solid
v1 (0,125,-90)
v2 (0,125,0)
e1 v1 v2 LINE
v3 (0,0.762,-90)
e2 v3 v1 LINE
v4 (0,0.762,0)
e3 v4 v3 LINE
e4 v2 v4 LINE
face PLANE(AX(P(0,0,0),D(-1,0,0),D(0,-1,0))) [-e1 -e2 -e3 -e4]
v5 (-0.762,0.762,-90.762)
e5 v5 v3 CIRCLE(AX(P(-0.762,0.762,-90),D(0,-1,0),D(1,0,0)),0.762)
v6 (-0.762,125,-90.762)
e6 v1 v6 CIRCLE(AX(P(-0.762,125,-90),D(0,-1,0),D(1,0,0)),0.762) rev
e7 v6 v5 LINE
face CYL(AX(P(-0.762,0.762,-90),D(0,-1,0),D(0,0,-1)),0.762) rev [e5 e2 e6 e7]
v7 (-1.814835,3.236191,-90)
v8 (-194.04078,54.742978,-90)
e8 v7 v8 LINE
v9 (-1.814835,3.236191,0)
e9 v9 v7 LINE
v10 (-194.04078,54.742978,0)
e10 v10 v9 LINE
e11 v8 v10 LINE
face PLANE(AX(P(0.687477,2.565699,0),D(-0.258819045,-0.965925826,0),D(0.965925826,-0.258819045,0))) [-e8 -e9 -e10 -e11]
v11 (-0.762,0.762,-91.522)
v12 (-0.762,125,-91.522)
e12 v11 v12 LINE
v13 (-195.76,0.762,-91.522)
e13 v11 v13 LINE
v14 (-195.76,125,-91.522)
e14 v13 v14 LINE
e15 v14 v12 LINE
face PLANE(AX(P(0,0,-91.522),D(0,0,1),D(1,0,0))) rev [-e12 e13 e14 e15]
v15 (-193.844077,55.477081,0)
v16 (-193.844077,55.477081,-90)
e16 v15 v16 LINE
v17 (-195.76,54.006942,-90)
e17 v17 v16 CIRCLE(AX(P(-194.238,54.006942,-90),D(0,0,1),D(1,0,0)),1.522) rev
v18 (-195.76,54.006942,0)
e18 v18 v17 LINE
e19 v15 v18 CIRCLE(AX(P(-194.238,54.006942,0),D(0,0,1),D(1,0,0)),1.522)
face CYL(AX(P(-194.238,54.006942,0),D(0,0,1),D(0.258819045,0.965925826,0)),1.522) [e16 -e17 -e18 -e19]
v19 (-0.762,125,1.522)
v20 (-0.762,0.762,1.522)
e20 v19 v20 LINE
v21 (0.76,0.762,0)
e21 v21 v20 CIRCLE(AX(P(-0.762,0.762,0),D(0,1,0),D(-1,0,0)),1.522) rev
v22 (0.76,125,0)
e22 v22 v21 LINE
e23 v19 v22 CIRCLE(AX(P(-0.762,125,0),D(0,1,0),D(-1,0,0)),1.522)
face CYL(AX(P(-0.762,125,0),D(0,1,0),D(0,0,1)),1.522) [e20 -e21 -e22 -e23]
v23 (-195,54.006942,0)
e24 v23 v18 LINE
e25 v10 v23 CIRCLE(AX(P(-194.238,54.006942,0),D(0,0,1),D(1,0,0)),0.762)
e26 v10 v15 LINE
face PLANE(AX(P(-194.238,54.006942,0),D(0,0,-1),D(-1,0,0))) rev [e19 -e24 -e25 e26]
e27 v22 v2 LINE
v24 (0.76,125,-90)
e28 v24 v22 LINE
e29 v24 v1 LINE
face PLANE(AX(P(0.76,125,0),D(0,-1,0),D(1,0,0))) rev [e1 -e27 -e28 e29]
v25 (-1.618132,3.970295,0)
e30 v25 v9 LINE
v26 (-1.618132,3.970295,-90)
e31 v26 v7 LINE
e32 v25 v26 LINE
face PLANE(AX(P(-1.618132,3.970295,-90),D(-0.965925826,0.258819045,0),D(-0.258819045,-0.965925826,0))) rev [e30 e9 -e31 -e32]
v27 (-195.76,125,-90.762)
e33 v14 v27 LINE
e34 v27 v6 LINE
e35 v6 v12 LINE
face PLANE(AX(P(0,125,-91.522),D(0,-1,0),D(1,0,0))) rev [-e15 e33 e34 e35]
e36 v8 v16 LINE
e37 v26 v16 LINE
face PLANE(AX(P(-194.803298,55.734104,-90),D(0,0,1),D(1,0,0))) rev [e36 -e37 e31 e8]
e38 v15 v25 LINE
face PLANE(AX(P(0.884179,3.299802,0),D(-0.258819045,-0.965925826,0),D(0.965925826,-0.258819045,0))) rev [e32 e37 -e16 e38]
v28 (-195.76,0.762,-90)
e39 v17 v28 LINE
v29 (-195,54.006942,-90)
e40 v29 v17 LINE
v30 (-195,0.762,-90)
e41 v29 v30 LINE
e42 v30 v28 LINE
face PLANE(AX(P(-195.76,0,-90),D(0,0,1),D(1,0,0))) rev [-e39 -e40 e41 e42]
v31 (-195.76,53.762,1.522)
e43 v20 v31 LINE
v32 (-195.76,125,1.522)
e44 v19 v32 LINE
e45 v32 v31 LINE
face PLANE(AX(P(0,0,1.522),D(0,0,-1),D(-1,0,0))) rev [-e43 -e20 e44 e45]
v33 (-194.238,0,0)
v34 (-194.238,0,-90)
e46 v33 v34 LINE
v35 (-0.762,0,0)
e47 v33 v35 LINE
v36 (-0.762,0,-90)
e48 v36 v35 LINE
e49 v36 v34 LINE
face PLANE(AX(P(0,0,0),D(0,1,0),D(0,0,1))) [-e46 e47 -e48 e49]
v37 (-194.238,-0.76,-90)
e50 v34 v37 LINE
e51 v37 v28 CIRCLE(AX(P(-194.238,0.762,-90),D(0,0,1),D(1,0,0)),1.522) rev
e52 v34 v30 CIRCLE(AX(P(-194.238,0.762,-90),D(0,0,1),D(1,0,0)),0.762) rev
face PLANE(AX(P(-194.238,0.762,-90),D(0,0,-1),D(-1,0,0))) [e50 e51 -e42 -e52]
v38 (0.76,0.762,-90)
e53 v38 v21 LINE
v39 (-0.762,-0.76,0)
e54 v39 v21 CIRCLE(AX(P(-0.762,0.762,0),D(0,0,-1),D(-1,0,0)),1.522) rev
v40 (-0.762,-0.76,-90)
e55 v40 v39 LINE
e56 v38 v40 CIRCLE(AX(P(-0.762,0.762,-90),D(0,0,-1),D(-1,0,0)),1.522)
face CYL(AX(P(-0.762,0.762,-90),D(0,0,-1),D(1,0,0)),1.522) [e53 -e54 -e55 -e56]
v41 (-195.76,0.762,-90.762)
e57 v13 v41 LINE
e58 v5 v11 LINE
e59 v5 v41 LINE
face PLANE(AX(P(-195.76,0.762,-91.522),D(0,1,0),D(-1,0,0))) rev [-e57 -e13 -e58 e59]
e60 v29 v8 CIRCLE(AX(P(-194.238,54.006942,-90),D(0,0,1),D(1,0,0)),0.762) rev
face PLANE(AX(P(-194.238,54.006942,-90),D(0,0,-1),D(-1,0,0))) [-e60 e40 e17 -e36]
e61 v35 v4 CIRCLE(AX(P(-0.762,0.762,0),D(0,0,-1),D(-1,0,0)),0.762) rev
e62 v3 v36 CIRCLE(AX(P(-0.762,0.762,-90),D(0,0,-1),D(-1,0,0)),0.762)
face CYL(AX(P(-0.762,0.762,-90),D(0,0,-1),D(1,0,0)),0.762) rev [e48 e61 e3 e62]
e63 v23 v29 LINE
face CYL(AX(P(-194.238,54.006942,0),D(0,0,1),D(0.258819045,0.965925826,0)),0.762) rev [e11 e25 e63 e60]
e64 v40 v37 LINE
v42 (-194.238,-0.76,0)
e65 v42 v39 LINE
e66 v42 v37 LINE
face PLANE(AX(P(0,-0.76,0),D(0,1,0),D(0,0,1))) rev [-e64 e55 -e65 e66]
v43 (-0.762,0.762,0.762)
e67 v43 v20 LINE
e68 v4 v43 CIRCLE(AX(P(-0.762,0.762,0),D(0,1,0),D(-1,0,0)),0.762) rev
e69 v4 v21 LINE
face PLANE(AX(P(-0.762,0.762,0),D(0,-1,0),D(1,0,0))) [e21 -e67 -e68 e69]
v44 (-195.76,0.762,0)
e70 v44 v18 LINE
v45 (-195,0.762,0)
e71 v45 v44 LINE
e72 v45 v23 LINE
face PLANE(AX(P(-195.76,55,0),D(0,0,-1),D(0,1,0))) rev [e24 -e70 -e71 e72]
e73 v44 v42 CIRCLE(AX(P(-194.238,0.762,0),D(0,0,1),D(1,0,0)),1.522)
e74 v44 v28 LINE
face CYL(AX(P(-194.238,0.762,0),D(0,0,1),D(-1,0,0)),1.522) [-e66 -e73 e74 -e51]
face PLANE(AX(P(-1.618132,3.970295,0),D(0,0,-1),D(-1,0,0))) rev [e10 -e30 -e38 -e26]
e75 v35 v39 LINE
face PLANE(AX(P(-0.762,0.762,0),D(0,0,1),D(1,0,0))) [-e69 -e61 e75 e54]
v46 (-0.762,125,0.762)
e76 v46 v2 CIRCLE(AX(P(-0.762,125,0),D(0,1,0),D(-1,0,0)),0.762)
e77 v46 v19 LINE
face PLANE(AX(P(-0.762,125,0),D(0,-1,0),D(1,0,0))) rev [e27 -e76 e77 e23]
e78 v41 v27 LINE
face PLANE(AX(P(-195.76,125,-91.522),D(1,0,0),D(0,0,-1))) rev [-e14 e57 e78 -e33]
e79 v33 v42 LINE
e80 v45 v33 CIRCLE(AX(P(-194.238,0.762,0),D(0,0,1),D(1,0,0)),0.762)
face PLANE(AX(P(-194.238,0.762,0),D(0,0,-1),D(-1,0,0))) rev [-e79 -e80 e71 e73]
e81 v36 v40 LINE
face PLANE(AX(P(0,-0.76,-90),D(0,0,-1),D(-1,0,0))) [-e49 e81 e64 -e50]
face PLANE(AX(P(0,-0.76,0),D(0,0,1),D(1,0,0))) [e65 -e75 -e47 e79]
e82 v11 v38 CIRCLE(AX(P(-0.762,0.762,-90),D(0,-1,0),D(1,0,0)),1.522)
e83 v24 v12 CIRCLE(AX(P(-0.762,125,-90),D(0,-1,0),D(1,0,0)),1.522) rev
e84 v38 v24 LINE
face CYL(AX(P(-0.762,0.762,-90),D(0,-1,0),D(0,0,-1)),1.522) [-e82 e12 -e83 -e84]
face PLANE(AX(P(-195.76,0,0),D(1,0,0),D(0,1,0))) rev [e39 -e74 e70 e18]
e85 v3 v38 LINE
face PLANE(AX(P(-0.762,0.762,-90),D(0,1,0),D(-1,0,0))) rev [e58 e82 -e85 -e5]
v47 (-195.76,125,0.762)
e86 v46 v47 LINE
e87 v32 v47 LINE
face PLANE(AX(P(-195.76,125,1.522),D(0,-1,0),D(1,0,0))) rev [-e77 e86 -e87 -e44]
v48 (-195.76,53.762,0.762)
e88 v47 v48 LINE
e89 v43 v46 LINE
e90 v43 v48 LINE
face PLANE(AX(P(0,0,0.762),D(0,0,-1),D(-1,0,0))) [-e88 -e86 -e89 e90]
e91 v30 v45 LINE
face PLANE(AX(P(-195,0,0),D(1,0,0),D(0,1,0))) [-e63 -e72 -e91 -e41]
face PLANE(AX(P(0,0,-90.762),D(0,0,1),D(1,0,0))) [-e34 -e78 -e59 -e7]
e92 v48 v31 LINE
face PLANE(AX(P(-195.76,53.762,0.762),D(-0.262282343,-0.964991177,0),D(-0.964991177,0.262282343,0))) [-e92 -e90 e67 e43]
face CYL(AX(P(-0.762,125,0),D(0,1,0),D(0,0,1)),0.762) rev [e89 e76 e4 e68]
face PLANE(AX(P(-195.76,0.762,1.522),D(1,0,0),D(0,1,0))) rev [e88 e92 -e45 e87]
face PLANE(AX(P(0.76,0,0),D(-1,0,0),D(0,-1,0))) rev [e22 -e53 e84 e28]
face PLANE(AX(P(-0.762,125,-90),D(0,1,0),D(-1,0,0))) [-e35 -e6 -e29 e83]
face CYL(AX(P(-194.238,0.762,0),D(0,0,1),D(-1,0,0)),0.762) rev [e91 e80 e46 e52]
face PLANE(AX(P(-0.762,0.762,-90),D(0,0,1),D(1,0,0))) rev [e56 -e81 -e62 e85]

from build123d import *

# Parameters (mm, degrees)
SKETCH3_W                    = 195
SKETCH3_H                    = 90
BASE_FLANGE1_DEPTH           = 0.76
EDGE_FLANGE1_STRIP_W         = 4.564
EDGE_FLANGE1_STRIP_H         = 0.76
EDGE_FLANGE1_STRIP_CUT_DEPTH = 90
EDGE_FLANGE1_DEPTH           = 90
EDGE_FLANGE2_STRIP_CUT_DEPTH = 90
EDGE_FLANGE2_DEPTH           = 90
EDGE_FLANGE3_STRIP_W         = 4.564
EDGE_FLANGE3_STRIP_H         = 0.76
EDGE_FLANGE3_STRIP_CUT_DEPTH = 90
EDGE_FLANGE3_DEPTH           = 90
EDGE_FLANGE6_DEPTH           = 124.238
EDGE_FLANGE7_DEPTH           = 124.238
CUT_EXTRUDE1_REACH           = 252.208


# Sheet-metal steps are written as plain solids
with BuildPart() as part:
    # Sketch3 → Base-Flange1 (new body)
    with BuildSketch(Plane(origin=(0, 0, 0), x_dir=(1, 0, 0), z_dir=(0, 1, 0))):
        with Locations((-97.5, 45)):
            Rectangle(SKETCH3_W, SKETCH3_H)
    extrude(amount=-BASE_FLANGE1_DEPTH)

    # Edge-Flange1 strip (across the edge) → Edge-Flange1 strip cut (cut)
    with BuildSketch(Plane(origin=(-195, 0, -90), x_dir=(1, 0, 0), z_dir=(0, 0, 1))):
        with Locations((-1.52, -0.38)):
            Rectangle(EDGE_FLANGE1_STRIP_W, EDGE_FLANGE1_STRIP_H)
    extrude(amount=EDGE_FLANGE1_STRIP_CUT_DEPTH, mode=Mode.SUBTRACT)

    # Edge-Flange1 section (across the edge) → Edge-Flange1 (add)
    with BuildSketch(Plane(origin=(-195, 0, -90), x_dir=(1, 0, 0), z_dir=(0, 0, 1))):
        with BuildLine():
            Line((-0.76, 0.762), (-0.76, 55))
            Line((-0.76, 55), (0, 55))
            Line((0, 55), (0, 0.762))
            ThreePointArc((0, 0.762), (0.223184633, 0.223184633), (0.762, 0))
            Line((0.762, 0), (0.762, -0.76))
            ThreePointArc((0.762, -0.76), (-0.314216521, -0.314216521), (-0.76, 0.762))
        make_face()
    extrude(amount=EDGE_FLANGE1_DEPTH)

    # Edge-Flange2 strip (across the edge) → Edge-Flange2 strip cut (cut)
    with BuildSketch(Plane(origin=(-195, 55, -90), x_dir=(-0.2588190451025146, -0.96592582628907, 0), z_dir=(0, 0, 1))):
        Polygon((-4.589327535, -2.016516504), (1.155922587, -0.477081374), (0.959220112, 0.257022254), (-4.786030009, -1.282412876), align=None)
    extrude(amount=EDGE_FLANGE2_STRIP_CUT_DEPTH, mode=Mode.SUBTRACT)

    # Edge-Flange2 section (across the edge) → Edge-Flange2 (add)
    with BuildSketch(Plane(origin=(-195, 55, -90), x_dir=(-0.2588190451025146, -0.96592582628907, 0), z_dir=(0, 0, 1))):
        with BuildLine():
            Line((-0.76, 0.993057734), (-0.76, 200))
            Line((-0.76, 200), (0, 200))
            Line((0, 200), (0, 0.993057734))
            ThreePointArc((0, 0.993057734), (0.298123791, 0.388522489), (0.959220112, 0.257022254))
            Line((0.959220112, 0.257022254), (1.155922587, -0.477081374))
            ThreePointArc((1.155922587, -0.477081374), (-0.164534895, -0.21442605), (-0.76, 0.993057734))
        make_face()
    extrude(amount=EDGE_FLANGE2_DEPTH)

    # Edge-Flange3 strip (across the edge) → Edge-Flange3 strip cut (cut)
    with BuildSketch(Plane(origin=(0, 0, 0), x_dir=(-1, 0, 0), z_dir=(0, 0, -1))):
        with Locations((-1.52, -0.38)):
            Rectangle(EDGE_FLANGE3_STRIP_W, EDGE_FLANGE3_STRIP_H)
    extrude(amount=EDGE_FLANGE3_STRIP_CUT_DEPTH, mode=Mode.SUBTRACT)

    # Edge-Flange3 section (across the edge) → Edge-Flange3 (add)
    with BuildSketch(Plane(origin=(0, 0, 0), x_dir=(-1, 0, 0), z_dir=(0, 0, -1))):
        with BuildLine():
            Line((-0.76, 0.762), (-0.76, 125))
            Line((-0.76, 125), (0, 125))
            Line((0, 125), (0, 0.762))
            ThreePointArc((0, 0.762), (0.223184633, 0.223184633), (0.762, 0))
            Line((0.762, 0), (0.762, -0.76))
            ThreePointArc((0.762, -0.76), (-0.314216521, -0.314216521), (-0.76, 0.762))
        make_face()
    extrude(amount=EDGE_FLANGE3_DEPTH)

    # Edge-Flange6 section (across the edge) → Edge-Flange6 (add)
    with BuildSketch(Plane(origin=(0, 0.762, 0.762), x_dir=(0, 0, -1), z_dir=(0, 1, 0))):
        with BuildLine():
            Line((-0.76, 0.762), (-0.76, 195.76))
            Line((-0.76, 195.76), (0, 195.76))
            Line((0, 195.76), (0, 0.762))
            ThreePointArc((0, 0.762), (0.223184633, 0.223184633), (0.762, 0))
            Line((0.762, 0), (0.762, -0.76))
            ThreePointArc((0.762, -0.76), (-0.314216521, -0.314216521), (-0.76, 0.762))
        make_face()
    extrude(amount=EDGE_FLANGE6_DEPTH)

    # Edge-Flange7 section (across the edge) → Edge-Flange7 (add)
    with BuildSketch(Plane(origin=(0, 125, -90.762), x_dir=(0, 0, 1), z_dir=(0, -1, 0))):
        with BuildLine():
            Line((-0.76, 0.762), (-0.76, 195.76))
            Line((-0.76, 195.76), (0, 195.76))
            Line((0, 195.76), (0, 0.762))
            ThreePointArc((0, 0.762), (0.223184633, 0.223184633), (0.762, 0))
            Line((0.762, 0), (0.762, -0.76))
            ThreePointArc((0.762, -0.76), (-0.314216521, -0.314216521), (-0.76, 0.762))
        make_face()
    extrude(amount=EDGE_FLANGE7_DEPTH)

    # Sketch29 → Cut-Extrude1 (cut, up to next)
    with BuildSketch(Plane.XY.offset(1.522), mode=Mode.PRIVATE) as cut_extrude1_sk1:
        Polygon((-195.76, 53.762), (-0.762, 0.762), (-195.76, 0.762), align=None)
    cut_extrude1_tool1 = extrude(cut_extrude1_sk1.sketch, amount=-CUT_EXTRUDE1_REACH, mode=Mode.PRIVATE) & part.part
    add(cut_extrude1_tool1.solids().sort_by_distance((-130.760667, 18.428667, 1.522))[0], mode=Mode.SUBTRACT)


solid = part.part
